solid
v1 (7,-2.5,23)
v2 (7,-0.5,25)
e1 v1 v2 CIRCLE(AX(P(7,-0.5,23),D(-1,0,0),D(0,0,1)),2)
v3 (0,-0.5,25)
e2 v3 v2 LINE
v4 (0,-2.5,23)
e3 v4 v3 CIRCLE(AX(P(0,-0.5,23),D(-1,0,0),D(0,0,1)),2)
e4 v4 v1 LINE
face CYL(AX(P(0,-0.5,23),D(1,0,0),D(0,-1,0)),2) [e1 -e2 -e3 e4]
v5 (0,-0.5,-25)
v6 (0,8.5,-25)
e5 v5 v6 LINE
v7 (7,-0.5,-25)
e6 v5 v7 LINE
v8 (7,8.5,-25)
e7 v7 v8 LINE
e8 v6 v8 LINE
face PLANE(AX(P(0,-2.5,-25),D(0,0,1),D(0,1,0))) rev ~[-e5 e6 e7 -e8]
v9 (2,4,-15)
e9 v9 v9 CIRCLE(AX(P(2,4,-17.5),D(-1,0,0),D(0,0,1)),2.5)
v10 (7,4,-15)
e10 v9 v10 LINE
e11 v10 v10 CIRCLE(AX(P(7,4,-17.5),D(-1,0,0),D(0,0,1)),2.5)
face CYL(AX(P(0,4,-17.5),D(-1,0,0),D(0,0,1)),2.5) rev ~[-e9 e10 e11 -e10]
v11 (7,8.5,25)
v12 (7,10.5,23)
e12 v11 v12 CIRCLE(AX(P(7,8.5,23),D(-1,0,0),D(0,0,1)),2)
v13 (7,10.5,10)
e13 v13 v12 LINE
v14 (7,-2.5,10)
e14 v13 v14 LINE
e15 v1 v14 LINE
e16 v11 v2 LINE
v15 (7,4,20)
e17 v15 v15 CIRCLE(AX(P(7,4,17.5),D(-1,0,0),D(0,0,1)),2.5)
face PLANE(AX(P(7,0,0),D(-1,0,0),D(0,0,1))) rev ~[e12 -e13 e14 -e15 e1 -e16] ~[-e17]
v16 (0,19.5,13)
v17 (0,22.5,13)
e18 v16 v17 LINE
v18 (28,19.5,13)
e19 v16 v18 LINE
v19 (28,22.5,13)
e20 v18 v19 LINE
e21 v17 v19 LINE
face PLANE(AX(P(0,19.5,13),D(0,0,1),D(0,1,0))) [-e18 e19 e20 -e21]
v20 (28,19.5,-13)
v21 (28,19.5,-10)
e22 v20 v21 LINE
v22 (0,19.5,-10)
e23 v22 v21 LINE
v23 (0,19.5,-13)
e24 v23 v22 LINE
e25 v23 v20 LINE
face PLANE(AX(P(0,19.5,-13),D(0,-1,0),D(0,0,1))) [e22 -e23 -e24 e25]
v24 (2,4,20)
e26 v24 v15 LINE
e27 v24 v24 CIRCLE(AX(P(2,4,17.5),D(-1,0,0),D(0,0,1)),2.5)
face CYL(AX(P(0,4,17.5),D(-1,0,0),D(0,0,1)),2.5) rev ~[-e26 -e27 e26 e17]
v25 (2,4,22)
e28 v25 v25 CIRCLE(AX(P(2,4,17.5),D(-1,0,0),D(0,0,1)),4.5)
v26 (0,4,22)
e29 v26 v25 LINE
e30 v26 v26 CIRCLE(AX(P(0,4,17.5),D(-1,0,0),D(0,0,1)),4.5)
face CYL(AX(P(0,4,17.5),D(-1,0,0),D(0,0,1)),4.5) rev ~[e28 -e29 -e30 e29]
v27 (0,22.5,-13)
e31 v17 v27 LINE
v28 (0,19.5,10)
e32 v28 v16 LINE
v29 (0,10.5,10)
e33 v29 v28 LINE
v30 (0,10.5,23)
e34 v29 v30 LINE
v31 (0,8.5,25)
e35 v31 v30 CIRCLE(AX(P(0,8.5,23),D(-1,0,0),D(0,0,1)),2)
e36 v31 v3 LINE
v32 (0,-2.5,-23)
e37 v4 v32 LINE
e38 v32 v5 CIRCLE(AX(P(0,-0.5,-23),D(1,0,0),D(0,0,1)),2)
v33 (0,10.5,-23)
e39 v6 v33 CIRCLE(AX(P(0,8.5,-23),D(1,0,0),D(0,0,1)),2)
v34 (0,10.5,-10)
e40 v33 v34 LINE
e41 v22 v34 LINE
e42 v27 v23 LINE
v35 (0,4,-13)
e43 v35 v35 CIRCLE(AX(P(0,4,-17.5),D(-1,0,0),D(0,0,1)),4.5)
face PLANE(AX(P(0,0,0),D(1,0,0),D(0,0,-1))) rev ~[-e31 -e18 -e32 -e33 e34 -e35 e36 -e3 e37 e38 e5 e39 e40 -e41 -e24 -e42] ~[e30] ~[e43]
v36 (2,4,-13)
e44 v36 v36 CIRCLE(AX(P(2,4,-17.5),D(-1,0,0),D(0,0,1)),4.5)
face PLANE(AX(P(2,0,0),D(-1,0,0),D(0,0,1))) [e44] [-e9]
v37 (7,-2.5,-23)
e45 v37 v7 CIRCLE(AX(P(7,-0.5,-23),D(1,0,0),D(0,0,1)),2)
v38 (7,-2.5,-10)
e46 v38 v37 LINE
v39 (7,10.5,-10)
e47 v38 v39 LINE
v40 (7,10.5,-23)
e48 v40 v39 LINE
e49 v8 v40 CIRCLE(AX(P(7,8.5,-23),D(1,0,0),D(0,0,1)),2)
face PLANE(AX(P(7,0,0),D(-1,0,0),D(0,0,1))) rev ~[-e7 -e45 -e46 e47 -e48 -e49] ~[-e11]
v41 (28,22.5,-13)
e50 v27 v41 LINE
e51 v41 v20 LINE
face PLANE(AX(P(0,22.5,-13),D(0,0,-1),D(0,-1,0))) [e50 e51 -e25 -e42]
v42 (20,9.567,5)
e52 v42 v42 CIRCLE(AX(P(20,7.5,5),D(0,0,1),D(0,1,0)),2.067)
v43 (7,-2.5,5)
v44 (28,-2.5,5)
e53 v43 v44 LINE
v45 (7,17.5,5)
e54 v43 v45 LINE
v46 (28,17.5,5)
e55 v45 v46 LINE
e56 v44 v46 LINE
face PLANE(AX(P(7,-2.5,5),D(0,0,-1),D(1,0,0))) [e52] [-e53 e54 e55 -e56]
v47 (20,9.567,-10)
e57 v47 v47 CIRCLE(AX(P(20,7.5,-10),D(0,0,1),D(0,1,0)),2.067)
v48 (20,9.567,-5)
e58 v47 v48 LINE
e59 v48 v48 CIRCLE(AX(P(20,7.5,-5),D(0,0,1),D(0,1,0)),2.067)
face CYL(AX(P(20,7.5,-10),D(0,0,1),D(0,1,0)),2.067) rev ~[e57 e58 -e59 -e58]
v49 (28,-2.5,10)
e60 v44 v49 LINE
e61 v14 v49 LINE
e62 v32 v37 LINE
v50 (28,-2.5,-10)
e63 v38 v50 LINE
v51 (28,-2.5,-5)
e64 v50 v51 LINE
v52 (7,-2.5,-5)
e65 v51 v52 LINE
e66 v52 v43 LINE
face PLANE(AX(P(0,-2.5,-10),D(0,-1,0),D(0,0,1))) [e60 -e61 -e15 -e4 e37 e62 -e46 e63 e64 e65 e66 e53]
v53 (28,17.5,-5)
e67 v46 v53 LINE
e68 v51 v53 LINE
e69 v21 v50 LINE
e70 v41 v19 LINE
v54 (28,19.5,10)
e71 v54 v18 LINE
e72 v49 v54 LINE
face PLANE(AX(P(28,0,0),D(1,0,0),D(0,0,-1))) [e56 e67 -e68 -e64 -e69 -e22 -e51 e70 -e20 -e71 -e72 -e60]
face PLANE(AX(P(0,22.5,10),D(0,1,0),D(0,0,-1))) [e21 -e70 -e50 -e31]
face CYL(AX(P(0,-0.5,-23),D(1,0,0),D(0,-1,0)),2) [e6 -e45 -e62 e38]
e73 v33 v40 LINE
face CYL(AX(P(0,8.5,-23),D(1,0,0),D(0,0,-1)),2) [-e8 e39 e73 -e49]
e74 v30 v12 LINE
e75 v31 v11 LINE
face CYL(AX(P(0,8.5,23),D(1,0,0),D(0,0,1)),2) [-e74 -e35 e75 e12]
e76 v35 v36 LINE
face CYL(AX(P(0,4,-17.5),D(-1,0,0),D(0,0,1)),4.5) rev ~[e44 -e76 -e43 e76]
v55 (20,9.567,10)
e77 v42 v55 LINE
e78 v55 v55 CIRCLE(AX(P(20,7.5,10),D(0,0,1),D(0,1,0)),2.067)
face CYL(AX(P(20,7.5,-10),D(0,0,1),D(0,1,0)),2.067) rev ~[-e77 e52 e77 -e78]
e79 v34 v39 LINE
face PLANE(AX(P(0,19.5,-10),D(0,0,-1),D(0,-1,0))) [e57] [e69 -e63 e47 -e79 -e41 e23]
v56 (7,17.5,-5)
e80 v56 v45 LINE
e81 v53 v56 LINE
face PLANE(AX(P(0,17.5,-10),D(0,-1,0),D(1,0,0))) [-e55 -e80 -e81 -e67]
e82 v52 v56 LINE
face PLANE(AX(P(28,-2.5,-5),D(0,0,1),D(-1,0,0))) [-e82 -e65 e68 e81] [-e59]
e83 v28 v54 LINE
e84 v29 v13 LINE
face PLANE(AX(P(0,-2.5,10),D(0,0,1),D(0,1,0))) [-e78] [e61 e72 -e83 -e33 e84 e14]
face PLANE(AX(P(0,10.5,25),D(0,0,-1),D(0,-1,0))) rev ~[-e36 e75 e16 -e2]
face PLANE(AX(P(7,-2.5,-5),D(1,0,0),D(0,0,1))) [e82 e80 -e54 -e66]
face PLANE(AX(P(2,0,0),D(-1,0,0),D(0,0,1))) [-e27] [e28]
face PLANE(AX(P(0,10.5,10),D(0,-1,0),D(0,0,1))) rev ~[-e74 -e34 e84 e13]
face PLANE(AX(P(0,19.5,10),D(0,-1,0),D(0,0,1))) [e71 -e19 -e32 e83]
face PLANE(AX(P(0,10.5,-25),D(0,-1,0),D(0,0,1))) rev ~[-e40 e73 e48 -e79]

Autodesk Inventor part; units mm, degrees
ref_plane "YZ Plane" through (0, 0, 0) normal (1, 0, 0) x (0, 1, 0)
ref_plane "XZ Plane" through (0, 0, 0) normal (0, 1, 0) x (-1, 0, 0)
ref_plane "XY Plane" through (0, 0, 0) normal (0, 0, 1) x (1, 0, 0)
sketch "Sketch7" plane through (0, 0, 0) normal (1, 0, 0) x (0, 0, -1)
  line L0 (10, -2.5) -> (-10, -2.5)
  line L1 (-10, -2.5) -> (-10, 22.5)
  line L2 (-10, 22.5) -> (10, 22.5)
  line L3 (10, 22.5) -> (10, -2.5)
  line L4 (13, 19.5) -> (10, 19.5)
  line L5 (10, 19.5) -> (10, 22.5)
  line L6 (10, 22.5) -> (13, 22.5)
  line L7 (13, 22.5) -> (13, 19.5)
  line L8 (-10, 19.5) -> (-13, 19.5)
  line L9 (-13, 19.5) -> (-13, 22.5)
  line L10 (-13, 22.5) -> (-10, 22.5)
  line L11 (-10, 22.5) -> (-10, 19.5)
  point P0 (0, -2.5)
  point P1 (0, 22.5)
  dimension "d26" = 20
  dimension "d27" = 25
  dimension "d30" = 3
  dimension "d31" = 3
  dimension "d32" = 3
  dimension "d33" = 3
  dimension "d72" = 0
extrude "Extrusion4" add sketch "Sketch7" along normal blind 28
sketch "Sketch15" plane through (0, -2.5, -10) normal (0, 0, -1) x (-1, 0, 0)
  line L0 (0, 0) -> (-28, 0) projected
  line L1 (-28, 0) -> (-28, 22) projected
  point P0 (0, 2.5)
  point P1 (-20, 10)
  dimension "d78" = 8
  dimension "d98" = 10
sketch "Sketch14" plane through (0, -2.5, -10) normal (0, -1, 0) x (1, 0, 0)
  line L0 (7, 15) -> (28, 15)
  line L1 (28, 15) -> (28, 5)
  line L2 (28, 5) -> (7, 5)
  line L3 (7, 5) -> (7, 15)
  line L4 (28, 20) -> (28, 0) projected
  point P0 (0, 10)
  point P1 (28, 10)
  point P2 (28, 10)
  dimension "d73" = 10
  dimension "d74" = 21
extrude "Extrusion8" cut sketch "Sketch14" against normal blind 20
hole "Hole6" at (20, 7.5, -10) direction (0, 0, 1) diameter 4.134 end through all thread size "M5x0.8" class "6H" standard "ISO Metric profile"
sketch "Sketch16" plane through (0, 0, 0) normal (-1, 0, 0) x (0, 0, 1)
  line L0 (25, -2.5) -> (-25, -2.5)
  line L1 (-25, -2.5) -> (-25, 10.5)
  line L2 (-25, 10.5) -> (25, 10.5)
  line L3 (25, 10.5) -> (25, -2.5)
  line L4 (10, -2.5) -> (-10, -2.5) projected
  line L5 (-10, -2.5) -> (-10, 19.5) projected
  line L6 (10, 19.5) -> (10, -2.5) projected
  circle A0 centre (17.5, 4) radius 2.5
  circle A1 centre (-17.5, 4) radius 2.5
  point P0 (0, 0)
  point P1 (25, 4)
  point P2 (-10, -2.5)
  point P3 (-10, 10.5)
  point P4 (10, 10.5)
  point P5 (10, -2.5)
  dimension "d86" = 15
  dimension "d88" = 15
  dimension "d89" = 13
  dimension "d90" = 5
  dimension "d91" = 7.5
  dimension "d92" = 7.5
extrude "Extrusion9" add sketch "Sketch16" against normal blind 7 contours L0 L6 L2 L3 | L0 L1 L2 L5
fillet "Fillet1" radius 2 4 edges at (3.5, -2.5, -25) (3.5, 10.5, -25) (3.5, -2.5, 25) (3.5, 10.5, 25)
sketch "Sketch17" plane through (0, 0, 0) normal (-1, 0, 0) x (0, 0, 1)
  circle A0 centre (17.5, 4) radius 4.5
  circle A1 centre (-17.5, 4) radius 4.5
  circle A2 centre (-17.5, 4) radius 2.5 projected
  circle A3 centre (17.5, 4) radius 2.5 projected
  point P0 (0, 0)
  dimension "d99" = 9
extrude "Extrusion10" cut sketch "Sketch17" against normal blind 2
equation "\"d88\" = d86"
equation "\"d91\" = 0.5 * d88"
equation "\"d92\" = d91"
properties part number "10-03-025"
